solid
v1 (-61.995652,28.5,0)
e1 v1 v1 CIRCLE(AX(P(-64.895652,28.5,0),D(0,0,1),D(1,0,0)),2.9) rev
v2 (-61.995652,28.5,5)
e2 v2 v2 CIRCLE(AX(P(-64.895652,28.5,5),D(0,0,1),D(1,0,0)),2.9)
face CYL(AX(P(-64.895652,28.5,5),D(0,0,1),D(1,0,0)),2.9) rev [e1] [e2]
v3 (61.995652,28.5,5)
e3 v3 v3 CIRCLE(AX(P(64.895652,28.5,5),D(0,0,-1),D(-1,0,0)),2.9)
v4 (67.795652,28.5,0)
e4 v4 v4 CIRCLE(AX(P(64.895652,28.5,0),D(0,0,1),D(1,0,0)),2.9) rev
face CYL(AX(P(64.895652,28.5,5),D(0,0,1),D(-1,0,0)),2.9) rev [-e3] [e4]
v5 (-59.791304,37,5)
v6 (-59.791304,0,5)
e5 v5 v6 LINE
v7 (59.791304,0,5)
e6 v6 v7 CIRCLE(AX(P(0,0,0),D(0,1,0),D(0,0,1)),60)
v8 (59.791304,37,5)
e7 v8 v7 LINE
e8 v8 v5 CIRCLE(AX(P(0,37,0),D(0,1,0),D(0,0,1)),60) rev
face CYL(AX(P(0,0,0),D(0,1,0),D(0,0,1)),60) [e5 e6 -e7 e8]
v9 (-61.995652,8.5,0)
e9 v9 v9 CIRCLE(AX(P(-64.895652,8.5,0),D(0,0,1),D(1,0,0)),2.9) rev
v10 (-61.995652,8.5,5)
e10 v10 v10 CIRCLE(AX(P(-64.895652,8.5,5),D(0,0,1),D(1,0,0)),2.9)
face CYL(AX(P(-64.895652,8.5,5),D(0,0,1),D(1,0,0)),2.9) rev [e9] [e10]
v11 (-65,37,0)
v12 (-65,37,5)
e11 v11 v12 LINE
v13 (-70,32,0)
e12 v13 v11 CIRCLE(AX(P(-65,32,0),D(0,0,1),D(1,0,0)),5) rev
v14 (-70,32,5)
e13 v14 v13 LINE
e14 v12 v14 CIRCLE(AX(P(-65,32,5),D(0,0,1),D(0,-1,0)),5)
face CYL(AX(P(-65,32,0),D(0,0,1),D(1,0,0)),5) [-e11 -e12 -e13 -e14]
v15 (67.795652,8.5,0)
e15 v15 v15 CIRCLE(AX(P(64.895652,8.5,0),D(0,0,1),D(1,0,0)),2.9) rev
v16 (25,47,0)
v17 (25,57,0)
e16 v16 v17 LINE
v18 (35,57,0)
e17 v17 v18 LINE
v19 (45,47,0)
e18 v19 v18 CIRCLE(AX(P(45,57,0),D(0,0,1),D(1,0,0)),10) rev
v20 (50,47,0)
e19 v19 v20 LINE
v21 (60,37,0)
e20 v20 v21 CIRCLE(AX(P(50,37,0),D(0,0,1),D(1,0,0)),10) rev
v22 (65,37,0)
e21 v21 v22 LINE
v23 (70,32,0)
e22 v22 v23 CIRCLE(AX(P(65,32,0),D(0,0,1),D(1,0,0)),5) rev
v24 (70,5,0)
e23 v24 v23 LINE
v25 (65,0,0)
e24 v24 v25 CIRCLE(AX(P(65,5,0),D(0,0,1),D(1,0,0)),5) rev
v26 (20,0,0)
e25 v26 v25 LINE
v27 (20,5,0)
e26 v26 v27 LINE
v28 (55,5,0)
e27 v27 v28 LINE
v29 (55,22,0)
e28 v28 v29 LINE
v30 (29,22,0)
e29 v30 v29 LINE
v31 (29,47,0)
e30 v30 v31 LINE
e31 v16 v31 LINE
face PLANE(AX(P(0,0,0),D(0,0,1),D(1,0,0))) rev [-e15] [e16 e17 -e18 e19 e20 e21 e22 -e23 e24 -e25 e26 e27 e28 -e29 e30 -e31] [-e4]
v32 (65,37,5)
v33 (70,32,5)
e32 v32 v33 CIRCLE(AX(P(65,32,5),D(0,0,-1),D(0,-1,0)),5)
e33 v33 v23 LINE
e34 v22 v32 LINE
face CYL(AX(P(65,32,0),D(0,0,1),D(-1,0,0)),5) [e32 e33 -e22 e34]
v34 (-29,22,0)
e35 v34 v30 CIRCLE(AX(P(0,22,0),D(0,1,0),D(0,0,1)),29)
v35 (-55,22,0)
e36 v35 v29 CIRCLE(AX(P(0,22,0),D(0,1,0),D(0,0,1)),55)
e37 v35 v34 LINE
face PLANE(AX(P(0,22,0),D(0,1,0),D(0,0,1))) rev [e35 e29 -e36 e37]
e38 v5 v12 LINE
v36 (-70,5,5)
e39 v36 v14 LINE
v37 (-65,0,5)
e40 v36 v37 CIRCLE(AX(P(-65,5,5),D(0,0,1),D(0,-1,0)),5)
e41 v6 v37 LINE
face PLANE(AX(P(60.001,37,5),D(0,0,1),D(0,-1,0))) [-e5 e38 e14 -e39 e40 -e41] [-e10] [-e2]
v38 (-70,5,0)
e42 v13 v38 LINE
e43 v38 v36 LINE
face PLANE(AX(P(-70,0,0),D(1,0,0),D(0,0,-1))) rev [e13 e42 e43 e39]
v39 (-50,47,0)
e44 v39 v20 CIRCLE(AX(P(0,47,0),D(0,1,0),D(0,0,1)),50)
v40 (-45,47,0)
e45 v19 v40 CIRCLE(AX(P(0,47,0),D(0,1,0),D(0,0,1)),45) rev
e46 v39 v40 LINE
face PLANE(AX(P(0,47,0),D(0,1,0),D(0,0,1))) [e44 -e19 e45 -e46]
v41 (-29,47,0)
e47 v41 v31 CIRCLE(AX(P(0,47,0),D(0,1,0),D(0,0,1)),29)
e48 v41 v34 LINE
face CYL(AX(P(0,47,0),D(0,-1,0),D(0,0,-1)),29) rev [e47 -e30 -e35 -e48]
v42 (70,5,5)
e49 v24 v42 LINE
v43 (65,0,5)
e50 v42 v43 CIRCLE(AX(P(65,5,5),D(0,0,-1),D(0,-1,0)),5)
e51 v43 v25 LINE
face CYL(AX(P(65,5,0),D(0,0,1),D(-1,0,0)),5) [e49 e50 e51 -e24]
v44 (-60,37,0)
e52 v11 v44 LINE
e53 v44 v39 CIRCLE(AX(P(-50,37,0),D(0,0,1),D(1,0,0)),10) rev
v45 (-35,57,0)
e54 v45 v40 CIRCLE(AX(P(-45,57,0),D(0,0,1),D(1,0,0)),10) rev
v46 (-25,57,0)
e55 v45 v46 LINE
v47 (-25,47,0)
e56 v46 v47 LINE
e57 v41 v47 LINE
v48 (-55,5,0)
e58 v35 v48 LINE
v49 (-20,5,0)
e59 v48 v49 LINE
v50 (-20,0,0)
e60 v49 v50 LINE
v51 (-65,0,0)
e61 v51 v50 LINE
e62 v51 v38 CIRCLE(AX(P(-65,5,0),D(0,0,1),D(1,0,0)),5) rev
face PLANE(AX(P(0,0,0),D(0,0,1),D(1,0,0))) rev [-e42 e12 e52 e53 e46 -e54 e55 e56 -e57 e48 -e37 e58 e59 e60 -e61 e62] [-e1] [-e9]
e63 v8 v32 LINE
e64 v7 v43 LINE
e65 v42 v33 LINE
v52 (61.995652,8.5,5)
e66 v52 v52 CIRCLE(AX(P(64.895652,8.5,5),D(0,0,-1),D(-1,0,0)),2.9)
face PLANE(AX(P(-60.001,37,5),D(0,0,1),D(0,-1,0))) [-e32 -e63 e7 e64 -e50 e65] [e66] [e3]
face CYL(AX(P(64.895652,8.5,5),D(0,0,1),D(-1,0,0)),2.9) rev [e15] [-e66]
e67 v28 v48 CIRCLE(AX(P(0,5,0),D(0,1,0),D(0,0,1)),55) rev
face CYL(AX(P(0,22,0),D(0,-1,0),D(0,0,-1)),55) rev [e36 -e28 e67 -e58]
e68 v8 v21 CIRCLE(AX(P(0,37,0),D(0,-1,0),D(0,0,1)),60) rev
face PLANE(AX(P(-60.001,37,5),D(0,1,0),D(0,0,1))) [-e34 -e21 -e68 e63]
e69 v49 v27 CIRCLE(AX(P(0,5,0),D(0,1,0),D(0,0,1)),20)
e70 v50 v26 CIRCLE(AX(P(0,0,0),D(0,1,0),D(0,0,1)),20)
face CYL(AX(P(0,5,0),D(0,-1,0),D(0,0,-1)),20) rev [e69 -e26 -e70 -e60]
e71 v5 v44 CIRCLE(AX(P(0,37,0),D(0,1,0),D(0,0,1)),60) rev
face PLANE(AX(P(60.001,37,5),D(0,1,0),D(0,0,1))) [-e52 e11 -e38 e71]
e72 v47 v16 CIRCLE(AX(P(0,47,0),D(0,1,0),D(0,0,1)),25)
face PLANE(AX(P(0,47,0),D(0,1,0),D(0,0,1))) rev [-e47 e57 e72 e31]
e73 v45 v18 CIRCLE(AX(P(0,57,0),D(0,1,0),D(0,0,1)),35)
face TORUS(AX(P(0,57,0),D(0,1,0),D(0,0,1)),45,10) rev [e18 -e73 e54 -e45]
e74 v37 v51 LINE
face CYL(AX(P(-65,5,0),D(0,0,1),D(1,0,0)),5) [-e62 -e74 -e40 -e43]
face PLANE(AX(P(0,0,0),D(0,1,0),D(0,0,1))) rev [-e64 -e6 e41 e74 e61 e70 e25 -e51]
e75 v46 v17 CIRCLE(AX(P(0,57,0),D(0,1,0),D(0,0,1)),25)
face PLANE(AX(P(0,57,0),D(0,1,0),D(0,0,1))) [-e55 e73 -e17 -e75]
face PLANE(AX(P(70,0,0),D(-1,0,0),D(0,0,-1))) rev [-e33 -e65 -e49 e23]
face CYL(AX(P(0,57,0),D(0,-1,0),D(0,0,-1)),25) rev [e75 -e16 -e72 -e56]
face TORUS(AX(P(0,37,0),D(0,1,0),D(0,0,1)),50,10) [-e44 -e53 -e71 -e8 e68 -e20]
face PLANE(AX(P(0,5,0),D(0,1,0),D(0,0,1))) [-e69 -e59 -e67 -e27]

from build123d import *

# Parameters (mm, degrees)
SKETCH1_R                = 25
SKETCH1_R_2              = 20
BOSS_EXTRUDE1_DEPTH      = 5
BOSS_EXTRUDE2_START      = -5
SKETCH2_R                = 60
SKETCH2_R_2              = 20
BOSS_EXTRUDE2_DEPTH      = 5
SKETCH3_R                = 60
SKETCH3_R_2              = 55
BOSS_EXTRUDE3_DEPTH      = 17
SKETCH4_R                = 60
SKETCH4_R_2              = 29
BOSS_EXTRUDE4_DEPTH      = 25
SKETCH5_R                = 35
SKETCH5_R_2              = 25
BOSS_EXTRUDE5_DEPTH      = 10
FILLET2_R                = 10
SKETCH6_W                = 10
SKETCH6_H                = 37
BOSS_EXTRUDE7_DEPTH      = 5
BOSS_EXTRUDE8_REACH      = 156.107
BOSS_EXTRUDE8_END_RADIUS = 60
SKETCH7_W                = 10
SKETCH7_H                = 37
M5_CLEARANCE_HOLE1_D     = 5.8
FILLET3_R                = 5


with BuildPart() as part:
    # Sketch1 → Boss-Extrude1 (new body)
    with BuildSketch(Plane(origin=(0, 0, 0), x_dir=(1, 0, 0), z_dir=(0, 1, 0))):
        with Locations(Location((0, 0, 0), (0, 0, 270))):
            Circle(SKETCH1_R)
        with Locations(Location((0, 0, 0), (0, 0, 270))):
            Circle(SKETCH1_R_2, mode=Mode.SUBTRACT)
    extrude(amount=BOSS_EXTRUDE1_DEPTH)

    # Sketch2 → Boss-Extrude2 (add)
    with BuildSketch(Plane(origin=(0, 5, 0), x_dir=(1, 0, 0), z_dir=(0, 1, 0)).offset(BOSS_EXTRUDE2_START)):
        with Locations(Location((0, 0, 0), (0, 0, 270))):
            Circle(SKETCH2_R)
        with Locations(Location((0, 0, 0), (0, 0, 270))):
            Circle(SKETCH2_R_2, mode=Mode.SUBTRACT)
    extrude(amount=BOSS_EXTRUDE2_DEPTH)

    # Sketch3 → Boss-Extrude3 (add)
    with BuildSketch(Plane(origin=(0, 5, 0), x_dir=(1, 0, 0), z_dir=(0, 1, 0))):
        with Locations(Location((0, 0, 0), (0, 0, 270))):
            Circle(SKETCH3_R)
        with Locations(Location((0, 0, 0), (0, 0, 270))):
            Circle(SKETCH3_R_2, mode=Mode.SUBTRACT)
    extrude(amount=BOSS_EXTRUDE3_DEPTH)

    # Sketch4 → Boss-Extrude4 (add)
    with BuildSketch(Plane(origin=(0, 22, 0), x_dir=(1, 0, 0), z_dir=(0, 1, 0))):
        with Locations(Location((0, 0, 0), (0, 0, 270))):
            Circle(SKETCH4_R)
        with Locations(Location((0, 0, 0), (0, 0, 270))):
            Circle(SKETCH4_R_2, mode=Mode.SUBTRACT)
    extrude(amount=BOSS_EXTRUDE4_DEPTH)

    # Sketch5 → Boss-Extrude5 (add)
    with BuildSketch(Plane(origin=(0, 47, 0), x_dir=(1, 0, 0), z_dir=(0, 1, 0))):
        with Locations(Location((0, 0, 0), (0, 0, 270))):
            Circle(SKETCH5_R)
        with Locations(Location((0, 0, 0), (0, 0, 270))):
            Circle(SKETCH5_R_2, mode=Mode.SUBTRACT)
    extrude(amount=BOSS_EXTRUDE5_DEPTH)

    # Fillet2
    fillet2_edges = [part.edges().sort_by_distance(p)[0] for p in [
        (0, 47, -60),
        (0, 47, -35),
    ]]
    fillet(fillet2_edges, radius=FILLET2_R - 0.0001)  # a hair under: the kernel refuses the full size



with BuildPart() as body_2:
    # Sketch6 → Boss-Extrude7 (new, symmetric)
    with BuildSketch(Plane.XY):
        with Locations((-65, 18.5)):
            Rectangle(SKETCH6_W, SKETCH6_H)
    extrude(amount=BOSS_EXTRUDE7_DEPTH, both=True)


with BuildPart() as part_1:
    add(part.part)

    add(body_2.part)  # Boss-Extrude8 merges body 2
    # Boss-Extrude8: up to this cylinder (the profile starts outside it)
    boss_extrude8_end = Plane(origin=(0, 18.5, 0), z_dir=(0, 1, 0)) * Cylinder(BOSS_EXTRUDE8_END_RADIUS, 433.214, mode=Mode.PRIVATE)
    # Sketch7 → Boss-Extrude8 (add, up to the surface)
    with BuildSketch(Plane.ZY.offset(70), mode=Mode.PRIVATE) as boss_extrude8_sk1:
        with Locations((0, 18.5)):
            Rectangle(SKETCH7_W, SKETCH7_H)
    boss_extrude8_tool1 = extrude(boss_extrude8_sk1.sketch, amount=-BOSS_EXTRUDE8_REACH, mode=Mode.PRIVATE) - boss_extrude8_end
    add(boss_extrude8_tool1.solids().sort_by_distance((-70, 18.5, 0))[0])

    # M5 Clearance Hole1 (through all)
    with Locations(Plane.XY.offset(5)):
        with Locations((-64.895651858, 8.5), (-64.895651858, 28.5)):
            Hole(M5_CLEARANCE_HOLE1_D / 2)

    # Fillet3
    fillet3_edges = [part_1.edges().sort_by_distance(p)[0] for p in [
        (-70, 37, 0),
        (-70, 0, 0),
    ]]
    fillet(fillet3_edges, radius=FILLET3_R)

    # Mirror1: part across plane


with BuildPart() as part_2:
    add(part_1.part)
    add(part_1.part.mirror(Plane(origin=(0, 0, 0), x_dir=(0, 0, 1), z_dir=(1, 0, 0))))


with BuildPart() as body_2_2:
    # Split1: the piece on the far side of the plane
    add(part_2.part)
    split(bisect_by=Plane.XY, keep=Keep.BOTTOM)


with BuildPart() as part_3:
    add(part_2.part)

    # Split1
    split(bisect_by=Plane.XY, keep=Keep.TOP)


solid = part_3.part
